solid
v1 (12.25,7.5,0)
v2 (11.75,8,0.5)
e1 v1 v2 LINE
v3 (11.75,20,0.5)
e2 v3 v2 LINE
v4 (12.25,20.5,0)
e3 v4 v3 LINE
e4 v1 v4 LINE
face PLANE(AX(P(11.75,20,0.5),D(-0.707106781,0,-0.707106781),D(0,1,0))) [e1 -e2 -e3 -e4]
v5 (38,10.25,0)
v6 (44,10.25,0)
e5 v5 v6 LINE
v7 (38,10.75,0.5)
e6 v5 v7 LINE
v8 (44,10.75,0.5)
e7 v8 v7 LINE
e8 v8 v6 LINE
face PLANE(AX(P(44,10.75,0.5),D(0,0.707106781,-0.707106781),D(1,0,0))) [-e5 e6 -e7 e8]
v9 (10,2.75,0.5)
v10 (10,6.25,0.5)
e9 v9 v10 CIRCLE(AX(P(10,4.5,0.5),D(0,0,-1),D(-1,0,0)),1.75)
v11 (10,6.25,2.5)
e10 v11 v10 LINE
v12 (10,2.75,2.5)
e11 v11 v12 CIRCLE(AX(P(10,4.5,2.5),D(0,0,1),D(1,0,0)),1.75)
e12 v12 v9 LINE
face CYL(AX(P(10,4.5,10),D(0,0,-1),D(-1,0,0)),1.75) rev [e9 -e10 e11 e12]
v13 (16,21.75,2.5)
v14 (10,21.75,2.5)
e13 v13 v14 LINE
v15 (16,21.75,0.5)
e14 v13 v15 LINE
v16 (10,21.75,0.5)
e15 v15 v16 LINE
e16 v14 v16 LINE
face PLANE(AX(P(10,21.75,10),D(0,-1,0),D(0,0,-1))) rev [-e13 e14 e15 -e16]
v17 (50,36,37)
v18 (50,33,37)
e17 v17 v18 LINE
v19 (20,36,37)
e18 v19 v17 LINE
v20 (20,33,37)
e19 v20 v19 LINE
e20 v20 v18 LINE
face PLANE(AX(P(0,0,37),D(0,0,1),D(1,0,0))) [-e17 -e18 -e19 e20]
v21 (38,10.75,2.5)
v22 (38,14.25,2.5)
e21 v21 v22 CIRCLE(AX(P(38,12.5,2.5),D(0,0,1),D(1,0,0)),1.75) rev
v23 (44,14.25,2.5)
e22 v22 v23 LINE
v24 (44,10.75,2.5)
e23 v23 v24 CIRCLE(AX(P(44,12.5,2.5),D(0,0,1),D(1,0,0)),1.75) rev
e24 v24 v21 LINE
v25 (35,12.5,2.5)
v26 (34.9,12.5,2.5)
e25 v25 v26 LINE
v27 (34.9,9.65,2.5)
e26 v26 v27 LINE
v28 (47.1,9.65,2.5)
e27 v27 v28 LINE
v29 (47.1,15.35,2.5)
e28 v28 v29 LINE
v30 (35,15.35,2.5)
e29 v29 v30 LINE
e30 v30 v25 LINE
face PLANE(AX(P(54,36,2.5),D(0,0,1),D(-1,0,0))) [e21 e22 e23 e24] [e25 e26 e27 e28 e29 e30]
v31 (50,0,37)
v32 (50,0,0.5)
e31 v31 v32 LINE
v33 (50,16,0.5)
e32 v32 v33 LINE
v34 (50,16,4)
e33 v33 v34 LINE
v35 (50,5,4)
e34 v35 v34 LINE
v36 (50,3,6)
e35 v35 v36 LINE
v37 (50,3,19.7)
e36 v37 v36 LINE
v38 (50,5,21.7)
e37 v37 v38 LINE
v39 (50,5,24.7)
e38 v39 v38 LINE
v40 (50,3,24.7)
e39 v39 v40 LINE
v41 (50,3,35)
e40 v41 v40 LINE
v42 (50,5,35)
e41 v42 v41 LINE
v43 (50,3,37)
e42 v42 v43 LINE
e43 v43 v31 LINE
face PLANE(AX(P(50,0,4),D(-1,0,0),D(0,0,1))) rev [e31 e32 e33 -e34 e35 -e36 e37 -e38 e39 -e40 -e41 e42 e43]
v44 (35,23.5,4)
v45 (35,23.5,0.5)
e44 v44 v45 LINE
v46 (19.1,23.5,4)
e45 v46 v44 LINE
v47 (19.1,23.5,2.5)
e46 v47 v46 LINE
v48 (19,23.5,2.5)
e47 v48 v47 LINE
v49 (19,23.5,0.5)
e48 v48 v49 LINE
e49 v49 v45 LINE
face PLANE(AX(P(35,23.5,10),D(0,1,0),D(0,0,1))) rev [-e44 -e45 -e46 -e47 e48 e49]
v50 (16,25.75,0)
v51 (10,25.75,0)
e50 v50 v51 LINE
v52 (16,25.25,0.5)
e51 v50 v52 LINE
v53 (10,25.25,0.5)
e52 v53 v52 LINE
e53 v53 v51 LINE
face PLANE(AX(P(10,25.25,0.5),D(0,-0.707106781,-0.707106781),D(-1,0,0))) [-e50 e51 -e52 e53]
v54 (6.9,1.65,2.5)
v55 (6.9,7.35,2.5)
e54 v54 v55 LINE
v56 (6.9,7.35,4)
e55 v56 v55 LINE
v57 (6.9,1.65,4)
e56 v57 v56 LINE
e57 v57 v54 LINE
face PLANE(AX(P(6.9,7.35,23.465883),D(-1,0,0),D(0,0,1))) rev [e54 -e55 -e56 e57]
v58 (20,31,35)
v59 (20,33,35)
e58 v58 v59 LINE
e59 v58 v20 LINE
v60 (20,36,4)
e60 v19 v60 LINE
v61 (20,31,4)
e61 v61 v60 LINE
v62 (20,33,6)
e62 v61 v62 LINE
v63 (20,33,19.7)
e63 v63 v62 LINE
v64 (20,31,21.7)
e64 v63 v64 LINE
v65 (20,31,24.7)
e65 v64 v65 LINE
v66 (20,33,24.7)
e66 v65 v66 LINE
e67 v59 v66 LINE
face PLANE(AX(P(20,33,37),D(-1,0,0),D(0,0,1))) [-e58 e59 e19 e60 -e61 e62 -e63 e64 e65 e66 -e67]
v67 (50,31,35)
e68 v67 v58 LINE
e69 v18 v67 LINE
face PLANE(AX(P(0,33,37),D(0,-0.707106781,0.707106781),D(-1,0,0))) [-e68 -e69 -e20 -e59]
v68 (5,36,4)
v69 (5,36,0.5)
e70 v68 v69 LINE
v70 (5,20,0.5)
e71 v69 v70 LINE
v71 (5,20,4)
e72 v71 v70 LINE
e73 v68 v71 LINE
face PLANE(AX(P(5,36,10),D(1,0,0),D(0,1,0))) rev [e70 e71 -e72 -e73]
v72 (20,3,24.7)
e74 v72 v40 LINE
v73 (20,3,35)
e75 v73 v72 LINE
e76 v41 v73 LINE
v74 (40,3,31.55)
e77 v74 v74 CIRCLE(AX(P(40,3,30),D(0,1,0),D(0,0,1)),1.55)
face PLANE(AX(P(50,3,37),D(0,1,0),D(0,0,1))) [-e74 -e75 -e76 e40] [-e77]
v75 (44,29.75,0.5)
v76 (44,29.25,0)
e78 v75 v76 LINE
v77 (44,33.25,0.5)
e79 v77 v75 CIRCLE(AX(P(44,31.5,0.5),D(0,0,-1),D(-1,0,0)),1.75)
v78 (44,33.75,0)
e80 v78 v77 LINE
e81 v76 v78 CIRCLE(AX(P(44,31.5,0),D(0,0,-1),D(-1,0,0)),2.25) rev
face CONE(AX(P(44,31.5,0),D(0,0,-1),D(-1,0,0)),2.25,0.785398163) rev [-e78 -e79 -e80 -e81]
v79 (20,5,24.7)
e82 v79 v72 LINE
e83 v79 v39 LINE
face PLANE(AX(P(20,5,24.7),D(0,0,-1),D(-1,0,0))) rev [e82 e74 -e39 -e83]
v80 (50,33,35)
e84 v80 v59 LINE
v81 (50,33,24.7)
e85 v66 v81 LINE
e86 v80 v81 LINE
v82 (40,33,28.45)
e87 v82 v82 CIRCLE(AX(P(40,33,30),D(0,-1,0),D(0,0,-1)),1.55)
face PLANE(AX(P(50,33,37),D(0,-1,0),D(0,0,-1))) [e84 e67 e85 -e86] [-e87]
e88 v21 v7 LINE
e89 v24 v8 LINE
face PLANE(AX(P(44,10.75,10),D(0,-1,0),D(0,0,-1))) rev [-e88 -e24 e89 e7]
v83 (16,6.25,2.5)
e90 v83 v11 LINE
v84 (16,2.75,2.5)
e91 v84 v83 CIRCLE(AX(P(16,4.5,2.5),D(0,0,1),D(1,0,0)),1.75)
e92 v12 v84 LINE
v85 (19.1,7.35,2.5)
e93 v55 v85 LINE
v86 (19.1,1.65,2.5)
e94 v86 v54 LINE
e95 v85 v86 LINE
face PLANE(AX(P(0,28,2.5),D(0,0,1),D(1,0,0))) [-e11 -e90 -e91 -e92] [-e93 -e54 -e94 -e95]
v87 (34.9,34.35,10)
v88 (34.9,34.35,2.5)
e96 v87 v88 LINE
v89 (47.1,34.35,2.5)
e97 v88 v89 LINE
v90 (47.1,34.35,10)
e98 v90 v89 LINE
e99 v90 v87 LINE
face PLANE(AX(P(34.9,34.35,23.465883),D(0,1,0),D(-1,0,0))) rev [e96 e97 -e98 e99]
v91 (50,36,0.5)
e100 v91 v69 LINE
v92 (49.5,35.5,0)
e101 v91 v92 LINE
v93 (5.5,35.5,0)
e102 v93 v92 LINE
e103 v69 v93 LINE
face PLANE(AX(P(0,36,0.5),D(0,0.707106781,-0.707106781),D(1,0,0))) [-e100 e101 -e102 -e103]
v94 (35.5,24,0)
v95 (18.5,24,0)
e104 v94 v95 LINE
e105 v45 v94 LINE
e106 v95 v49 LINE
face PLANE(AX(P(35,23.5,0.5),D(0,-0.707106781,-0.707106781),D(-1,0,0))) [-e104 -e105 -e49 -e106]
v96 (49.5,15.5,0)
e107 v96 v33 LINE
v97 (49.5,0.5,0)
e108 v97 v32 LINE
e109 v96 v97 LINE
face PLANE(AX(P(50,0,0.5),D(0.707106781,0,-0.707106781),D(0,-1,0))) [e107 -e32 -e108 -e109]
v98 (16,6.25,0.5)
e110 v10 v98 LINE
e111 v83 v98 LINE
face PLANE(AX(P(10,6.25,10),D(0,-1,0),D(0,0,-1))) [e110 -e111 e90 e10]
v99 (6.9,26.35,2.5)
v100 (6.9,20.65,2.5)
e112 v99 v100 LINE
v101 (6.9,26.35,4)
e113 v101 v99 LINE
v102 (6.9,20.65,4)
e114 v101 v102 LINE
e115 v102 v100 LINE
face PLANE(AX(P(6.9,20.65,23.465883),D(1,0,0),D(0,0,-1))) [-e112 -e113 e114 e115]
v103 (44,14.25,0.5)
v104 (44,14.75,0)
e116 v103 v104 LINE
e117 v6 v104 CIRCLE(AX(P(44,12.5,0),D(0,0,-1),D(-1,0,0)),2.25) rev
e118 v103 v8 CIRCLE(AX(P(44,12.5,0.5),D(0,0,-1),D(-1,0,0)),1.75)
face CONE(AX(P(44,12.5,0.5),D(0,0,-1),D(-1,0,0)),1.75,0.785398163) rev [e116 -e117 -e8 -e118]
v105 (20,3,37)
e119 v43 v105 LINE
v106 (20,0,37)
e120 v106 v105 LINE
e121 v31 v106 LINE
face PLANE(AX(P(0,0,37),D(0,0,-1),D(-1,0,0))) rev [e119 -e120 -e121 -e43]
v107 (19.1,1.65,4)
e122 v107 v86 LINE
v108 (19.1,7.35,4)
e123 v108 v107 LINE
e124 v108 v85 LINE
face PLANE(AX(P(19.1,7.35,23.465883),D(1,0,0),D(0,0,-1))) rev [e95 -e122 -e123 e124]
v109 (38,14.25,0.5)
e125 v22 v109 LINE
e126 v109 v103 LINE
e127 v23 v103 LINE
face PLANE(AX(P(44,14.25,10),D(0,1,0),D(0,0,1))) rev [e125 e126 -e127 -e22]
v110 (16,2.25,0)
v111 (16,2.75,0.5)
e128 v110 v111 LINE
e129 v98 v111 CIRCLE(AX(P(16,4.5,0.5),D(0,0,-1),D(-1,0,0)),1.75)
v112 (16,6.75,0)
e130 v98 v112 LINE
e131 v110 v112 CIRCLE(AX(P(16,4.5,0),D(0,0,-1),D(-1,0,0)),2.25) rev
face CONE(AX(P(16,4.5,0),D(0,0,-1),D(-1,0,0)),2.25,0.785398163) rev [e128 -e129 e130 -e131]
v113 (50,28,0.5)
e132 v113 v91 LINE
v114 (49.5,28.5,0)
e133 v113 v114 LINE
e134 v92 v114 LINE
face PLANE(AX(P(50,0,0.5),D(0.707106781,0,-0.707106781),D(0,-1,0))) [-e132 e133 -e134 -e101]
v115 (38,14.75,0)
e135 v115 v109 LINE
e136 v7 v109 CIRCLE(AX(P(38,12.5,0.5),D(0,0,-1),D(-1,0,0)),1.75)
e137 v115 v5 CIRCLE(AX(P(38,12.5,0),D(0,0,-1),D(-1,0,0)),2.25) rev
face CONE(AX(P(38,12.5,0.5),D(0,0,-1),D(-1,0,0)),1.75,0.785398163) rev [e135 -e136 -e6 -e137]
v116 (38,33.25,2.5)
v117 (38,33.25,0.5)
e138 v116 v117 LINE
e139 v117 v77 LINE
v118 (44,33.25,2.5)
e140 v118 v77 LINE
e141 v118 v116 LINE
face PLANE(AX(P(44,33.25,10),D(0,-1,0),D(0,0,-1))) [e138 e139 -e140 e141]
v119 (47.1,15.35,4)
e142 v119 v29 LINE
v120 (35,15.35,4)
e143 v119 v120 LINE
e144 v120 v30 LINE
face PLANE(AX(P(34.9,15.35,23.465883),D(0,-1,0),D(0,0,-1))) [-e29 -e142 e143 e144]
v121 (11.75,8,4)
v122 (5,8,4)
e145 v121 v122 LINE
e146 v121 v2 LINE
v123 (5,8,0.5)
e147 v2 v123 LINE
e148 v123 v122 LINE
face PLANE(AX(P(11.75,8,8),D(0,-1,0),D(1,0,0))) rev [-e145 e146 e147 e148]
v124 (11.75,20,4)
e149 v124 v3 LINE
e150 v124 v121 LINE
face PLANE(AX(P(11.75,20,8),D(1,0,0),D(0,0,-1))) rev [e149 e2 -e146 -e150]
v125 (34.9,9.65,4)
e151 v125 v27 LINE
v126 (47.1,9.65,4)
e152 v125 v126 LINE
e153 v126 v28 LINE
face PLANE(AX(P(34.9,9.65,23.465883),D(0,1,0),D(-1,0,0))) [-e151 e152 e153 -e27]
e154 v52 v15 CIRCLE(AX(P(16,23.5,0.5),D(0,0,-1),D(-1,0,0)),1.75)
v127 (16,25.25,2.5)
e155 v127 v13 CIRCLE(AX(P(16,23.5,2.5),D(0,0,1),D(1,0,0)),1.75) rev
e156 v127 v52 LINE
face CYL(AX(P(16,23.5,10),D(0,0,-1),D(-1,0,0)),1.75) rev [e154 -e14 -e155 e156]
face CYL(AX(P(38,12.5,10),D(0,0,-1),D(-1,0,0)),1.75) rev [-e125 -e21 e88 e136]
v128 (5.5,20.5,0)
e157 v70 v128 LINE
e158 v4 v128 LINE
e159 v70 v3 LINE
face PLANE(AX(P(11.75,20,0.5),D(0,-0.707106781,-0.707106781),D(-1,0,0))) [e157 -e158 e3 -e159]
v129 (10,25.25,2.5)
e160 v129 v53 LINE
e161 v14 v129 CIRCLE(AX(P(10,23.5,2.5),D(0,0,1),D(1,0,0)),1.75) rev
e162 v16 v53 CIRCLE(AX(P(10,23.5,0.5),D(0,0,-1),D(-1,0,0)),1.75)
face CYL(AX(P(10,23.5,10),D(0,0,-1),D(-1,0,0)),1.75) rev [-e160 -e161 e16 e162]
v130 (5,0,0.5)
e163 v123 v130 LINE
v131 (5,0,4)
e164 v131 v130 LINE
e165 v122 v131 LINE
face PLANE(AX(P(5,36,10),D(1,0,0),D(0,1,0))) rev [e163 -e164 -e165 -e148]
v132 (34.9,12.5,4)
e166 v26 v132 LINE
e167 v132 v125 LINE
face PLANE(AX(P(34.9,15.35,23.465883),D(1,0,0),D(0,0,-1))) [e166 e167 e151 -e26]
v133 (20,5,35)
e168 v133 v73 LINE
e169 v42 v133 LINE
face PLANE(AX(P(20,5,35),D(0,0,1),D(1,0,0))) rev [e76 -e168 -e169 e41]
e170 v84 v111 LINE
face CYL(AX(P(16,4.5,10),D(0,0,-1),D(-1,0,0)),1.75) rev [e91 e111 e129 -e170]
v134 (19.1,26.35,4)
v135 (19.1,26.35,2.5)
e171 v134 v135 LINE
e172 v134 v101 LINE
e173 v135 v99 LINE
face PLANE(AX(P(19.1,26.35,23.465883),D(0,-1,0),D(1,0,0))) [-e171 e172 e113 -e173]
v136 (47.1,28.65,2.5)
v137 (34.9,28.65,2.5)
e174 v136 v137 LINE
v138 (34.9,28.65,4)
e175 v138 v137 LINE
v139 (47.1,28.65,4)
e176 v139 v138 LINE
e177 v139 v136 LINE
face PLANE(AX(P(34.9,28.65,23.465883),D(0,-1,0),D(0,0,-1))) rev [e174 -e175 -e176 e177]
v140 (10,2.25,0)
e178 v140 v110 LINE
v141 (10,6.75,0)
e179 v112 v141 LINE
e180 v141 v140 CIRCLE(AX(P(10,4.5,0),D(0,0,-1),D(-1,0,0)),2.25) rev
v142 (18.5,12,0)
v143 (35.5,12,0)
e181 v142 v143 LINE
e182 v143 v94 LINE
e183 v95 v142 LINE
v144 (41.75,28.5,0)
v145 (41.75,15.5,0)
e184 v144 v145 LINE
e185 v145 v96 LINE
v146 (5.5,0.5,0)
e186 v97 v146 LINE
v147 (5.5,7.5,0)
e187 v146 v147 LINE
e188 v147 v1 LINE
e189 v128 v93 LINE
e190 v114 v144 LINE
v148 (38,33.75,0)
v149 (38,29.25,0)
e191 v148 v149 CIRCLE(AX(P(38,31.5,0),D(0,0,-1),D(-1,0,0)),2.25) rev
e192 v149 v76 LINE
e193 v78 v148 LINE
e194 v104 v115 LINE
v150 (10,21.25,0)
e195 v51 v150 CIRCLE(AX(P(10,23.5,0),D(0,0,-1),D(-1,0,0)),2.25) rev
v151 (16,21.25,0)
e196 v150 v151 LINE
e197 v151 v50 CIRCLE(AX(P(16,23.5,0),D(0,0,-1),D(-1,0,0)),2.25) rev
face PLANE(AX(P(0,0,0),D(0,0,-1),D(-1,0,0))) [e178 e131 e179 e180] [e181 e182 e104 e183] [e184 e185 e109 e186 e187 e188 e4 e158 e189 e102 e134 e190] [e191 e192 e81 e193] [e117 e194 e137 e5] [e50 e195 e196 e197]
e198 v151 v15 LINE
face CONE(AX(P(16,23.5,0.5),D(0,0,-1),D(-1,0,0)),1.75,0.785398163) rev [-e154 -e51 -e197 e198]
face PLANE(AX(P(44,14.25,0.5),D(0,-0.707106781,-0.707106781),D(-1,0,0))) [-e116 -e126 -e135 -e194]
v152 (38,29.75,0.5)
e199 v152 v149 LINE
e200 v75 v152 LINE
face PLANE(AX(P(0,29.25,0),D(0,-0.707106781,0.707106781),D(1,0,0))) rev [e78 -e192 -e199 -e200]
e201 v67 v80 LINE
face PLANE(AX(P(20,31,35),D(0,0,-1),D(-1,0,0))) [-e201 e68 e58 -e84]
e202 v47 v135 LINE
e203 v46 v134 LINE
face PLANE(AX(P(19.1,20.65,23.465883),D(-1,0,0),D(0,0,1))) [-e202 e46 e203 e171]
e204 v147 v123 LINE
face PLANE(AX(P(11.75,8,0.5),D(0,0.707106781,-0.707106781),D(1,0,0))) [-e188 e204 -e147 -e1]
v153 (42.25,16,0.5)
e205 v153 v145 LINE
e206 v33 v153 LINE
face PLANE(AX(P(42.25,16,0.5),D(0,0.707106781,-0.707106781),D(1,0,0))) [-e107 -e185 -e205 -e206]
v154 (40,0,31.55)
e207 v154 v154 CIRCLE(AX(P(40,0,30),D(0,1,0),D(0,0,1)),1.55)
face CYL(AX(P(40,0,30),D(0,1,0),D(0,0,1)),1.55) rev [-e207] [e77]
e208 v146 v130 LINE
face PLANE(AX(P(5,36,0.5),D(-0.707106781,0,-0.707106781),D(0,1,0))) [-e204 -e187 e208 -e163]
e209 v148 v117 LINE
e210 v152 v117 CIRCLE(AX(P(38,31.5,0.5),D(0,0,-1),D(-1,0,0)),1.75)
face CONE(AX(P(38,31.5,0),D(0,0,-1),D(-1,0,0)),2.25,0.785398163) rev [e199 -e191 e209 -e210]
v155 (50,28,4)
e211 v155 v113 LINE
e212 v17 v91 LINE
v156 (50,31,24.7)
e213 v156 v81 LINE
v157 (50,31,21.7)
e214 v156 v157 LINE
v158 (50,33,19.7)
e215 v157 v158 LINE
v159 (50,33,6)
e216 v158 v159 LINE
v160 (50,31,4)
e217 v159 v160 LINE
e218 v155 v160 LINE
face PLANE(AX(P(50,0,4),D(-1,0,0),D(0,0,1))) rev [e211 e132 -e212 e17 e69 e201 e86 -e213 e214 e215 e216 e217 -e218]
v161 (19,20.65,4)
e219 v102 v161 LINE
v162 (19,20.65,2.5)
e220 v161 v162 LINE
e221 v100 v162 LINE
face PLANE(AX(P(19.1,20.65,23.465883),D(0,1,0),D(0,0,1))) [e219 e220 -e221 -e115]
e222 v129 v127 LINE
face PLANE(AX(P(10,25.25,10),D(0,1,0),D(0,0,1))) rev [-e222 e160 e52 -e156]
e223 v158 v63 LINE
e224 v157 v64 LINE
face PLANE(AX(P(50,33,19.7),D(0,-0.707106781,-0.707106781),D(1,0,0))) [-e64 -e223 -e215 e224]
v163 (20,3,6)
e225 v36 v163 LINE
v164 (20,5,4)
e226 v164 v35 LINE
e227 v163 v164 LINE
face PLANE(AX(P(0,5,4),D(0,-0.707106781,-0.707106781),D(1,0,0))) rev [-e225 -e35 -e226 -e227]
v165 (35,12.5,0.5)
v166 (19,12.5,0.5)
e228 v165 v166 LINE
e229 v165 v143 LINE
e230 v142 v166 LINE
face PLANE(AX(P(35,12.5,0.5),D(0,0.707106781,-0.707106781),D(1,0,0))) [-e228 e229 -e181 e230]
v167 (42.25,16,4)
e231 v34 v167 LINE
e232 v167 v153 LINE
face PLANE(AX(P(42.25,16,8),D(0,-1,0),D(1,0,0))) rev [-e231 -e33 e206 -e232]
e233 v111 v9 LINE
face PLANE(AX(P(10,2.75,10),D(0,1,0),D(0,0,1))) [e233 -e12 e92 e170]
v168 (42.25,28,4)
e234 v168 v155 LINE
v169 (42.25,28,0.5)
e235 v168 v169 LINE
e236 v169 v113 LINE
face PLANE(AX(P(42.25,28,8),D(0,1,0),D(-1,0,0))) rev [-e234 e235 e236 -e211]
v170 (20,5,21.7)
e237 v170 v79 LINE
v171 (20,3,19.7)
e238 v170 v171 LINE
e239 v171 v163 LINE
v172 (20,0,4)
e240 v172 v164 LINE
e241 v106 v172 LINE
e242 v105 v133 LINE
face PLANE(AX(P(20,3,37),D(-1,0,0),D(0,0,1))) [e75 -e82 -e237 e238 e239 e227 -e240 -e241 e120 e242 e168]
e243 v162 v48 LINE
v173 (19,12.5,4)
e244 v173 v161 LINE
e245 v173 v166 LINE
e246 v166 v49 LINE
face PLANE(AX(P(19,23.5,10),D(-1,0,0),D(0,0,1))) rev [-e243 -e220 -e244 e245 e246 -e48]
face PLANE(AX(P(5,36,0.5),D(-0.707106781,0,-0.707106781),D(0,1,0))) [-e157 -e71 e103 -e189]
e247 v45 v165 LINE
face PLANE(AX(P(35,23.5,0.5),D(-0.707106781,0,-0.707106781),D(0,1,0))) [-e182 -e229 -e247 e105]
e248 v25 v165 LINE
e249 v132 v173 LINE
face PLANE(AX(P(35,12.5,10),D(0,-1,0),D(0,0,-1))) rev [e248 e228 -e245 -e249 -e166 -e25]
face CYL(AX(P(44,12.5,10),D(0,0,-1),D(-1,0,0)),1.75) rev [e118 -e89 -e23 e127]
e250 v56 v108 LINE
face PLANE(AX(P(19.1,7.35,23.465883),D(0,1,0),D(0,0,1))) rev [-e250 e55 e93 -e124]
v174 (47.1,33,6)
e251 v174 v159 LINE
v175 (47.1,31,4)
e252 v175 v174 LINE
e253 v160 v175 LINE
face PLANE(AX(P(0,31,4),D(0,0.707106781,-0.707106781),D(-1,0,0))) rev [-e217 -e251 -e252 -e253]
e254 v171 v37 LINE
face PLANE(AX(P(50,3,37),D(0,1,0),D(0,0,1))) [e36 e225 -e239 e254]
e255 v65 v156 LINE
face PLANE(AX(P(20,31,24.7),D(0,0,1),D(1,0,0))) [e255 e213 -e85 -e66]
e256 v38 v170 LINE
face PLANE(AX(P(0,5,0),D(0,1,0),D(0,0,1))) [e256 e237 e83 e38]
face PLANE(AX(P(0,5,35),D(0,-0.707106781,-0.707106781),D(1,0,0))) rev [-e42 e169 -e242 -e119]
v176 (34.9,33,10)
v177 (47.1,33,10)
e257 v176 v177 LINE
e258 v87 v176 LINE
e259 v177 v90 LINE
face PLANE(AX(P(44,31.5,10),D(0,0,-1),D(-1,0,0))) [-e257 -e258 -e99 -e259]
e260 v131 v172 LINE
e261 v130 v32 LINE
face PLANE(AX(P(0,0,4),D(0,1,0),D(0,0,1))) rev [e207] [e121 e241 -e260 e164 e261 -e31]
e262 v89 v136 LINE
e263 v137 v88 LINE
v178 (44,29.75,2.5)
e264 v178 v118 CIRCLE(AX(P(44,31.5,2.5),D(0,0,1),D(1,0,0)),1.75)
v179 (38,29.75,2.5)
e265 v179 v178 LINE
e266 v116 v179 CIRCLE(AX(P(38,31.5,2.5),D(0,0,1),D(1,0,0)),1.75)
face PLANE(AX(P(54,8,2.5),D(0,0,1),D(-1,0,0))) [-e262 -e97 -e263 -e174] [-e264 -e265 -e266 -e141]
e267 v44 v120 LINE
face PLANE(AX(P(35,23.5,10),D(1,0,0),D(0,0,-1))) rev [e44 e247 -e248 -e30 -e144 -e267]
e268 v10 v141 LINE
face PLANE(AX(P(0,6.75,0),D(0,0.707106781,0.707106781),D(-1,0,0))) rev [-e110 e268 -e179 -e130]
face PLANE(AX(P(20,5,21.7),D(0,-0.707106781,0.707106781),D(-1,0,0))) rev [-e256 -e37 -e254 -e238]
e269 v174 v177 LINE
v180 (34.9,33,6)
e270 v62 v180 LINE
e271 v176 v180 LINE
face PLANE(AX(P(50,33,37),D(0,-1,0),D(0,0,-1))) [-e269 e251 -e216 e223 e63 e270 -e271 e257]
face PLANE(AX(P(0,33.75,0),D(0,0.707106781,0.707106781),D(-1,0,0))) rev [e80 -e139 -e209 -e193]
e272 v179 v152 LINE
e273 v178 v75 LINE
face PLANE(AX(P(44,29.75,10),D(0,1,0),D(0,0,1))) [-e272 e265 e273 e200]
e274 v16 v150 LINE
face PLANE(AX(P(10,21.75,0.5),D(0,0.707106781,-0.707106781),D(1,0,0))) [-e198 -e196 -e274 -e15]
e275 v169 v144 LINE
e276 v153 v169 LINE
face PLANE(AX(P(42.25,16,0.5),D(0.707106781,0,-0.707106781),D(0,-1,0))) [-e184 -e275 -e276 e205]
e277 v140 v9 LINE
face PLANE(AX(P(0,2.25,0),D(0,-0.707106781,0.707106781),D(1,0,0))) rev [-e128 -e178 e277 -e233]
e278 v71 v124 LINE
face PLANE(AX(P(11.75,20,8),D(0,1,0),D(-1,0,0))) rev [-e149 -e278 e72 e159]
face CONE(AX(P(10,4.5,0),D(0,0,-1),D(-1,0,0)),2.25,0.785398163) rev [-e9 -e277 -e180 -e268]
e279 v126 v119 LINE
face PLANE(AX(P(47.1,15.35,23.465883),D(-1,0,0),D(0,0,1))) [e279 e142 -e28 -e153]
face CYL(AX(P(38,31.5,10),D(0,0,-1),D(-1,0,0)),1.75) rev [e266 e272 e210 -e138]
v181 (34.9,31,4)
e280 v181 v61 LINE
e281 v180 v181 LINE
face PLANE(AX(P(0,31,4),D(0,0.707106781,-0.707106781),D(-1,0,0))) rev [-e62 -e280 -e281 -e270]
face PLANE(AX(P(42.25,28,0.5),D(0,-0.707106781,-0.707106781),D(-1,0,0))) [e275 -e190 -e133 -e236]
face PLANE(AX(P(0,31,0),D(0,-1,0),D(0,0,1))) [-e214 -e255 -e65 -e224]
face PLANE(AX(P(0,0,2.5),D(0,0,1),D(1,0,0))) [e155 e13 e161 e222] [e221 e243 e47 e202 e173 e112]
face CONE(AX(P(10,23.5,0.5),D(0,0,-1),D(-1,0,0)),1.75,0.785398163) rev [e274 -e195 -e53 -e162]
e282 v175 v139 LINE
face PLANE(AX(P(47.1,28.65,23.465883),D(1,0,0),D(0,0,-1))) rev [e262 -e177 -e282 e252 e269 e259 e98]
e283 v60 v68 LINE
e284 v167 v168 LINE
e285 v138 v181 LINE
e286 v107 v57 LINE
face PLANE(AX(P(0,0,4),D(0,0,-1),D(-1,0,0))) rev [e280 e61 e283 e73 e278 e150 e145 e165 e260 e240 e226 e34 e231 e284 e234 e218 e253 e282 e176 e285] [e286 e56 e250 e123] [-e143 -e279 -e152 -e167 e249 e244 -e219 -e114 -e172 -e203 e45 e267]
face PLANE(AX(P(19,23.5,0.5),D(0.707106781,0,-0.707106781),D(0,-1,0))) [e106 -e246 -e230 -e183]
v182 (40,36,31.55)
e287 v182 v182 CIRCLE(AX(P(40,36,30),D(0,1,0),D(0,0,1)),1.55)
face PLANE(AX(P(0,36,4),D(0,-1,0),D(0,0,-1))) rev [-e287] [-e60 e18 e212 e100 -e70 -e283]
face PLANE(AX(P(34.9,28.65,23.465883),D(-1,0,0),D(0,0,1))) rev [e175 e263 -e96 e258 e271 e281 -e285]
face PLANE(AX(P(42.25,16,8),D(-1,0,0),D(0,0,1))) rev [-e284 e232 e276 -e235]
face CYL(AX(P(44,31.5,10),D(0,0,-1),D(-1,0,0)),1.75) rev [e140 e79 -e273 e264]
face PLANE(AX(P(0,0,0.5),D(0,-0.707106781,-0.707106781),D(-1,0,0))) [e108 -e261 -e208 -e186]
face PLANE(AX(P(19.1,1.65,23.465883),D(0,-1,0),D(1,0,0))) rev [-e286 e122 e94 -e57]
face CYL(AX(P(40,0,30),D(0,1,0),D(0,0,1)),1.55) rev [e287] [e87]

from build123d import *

# Parameters (mm, degrees)
SKETCH1_W                   = 50
SKETCH1_H                   = 36
BOSS_EXTRUDE1_DEPTH         = 4
SKETCH2_W                   = 30
SKETCH2_H                   = 3
BOSS_EXTRUDE2_DEPTH         = 37
SKETCH3_R                   = 1.55
CUT_EXTRUDE1_DEPTH          = 72.867934435
SKETCH4_W                   = 16
SKETCH4_H                   = 11
CUT_EXTRUDE2_DEPTH          = 10
CUT_EXTRUDE3_DEPTH          = 10
SKETCH6_W                   = 20
SKETCH6_H                   = 12
CUT_EXTRUDE4_DEPTH          = 8
SKETCH7_W                   = 30
SKETCH7_H                   = 3
BOSS_EXTRUDE3_DEPTH         = 2
CHAMFER1_SIZE               = 2
CIRPATTERN1_COUNT           = 2
CIRPATTERN1_COPY_1_DEPTH    = 10
SKETCH9_W                   = 5
SKETCH9_H                   = 36
CUT_EXTRUDE6_DEPTH          = 10
CHAMFER2_SIZE               = 0.5
SKETCH10_W                  = 30
SKETCH10_H                  = 2
BOSS_EXTRUDE4_DEPTH         = 2
CHAMFER3_SIZE               = 2
CUT_EXTRUDE7_START          = -1.5
SKETCH12_W                  = 12.2
SKETCH12_H                  = 5.7
CUT_EXTRUDE7_DEPTH          = 7.5
CIRPATTERN2_COUNT           = 2
CIRPATTERN2_START           = -1.5
CIRPATTERN2_COPY_1_SKETCH_W = 12.2
CIRPATTERN2_COPY_1_SKETCH_H = 5.7
CIRPATTERN2_COPY_1_DEPTH    = 7.5
CHAMFER4_SIZE               = 2


with BuildPart() as part:
    # Sketch1 → Boss-Extrude1 (new body)
    with BuildSketch(Plane.XY):
        with Locations((25, 18)):
            Rectangle(SKETCH1_W, SKETCH1_H)
    extrude(amount=BOSS_EXTRUDE1_DEPTH)

    # Sketch2 → Boss-Extrude2 (add)
    with BuildSketch(Plane(origin=(0, 0, 0), x_dir=(-1, 0, 0), z_dir=(0, 0, -1))):
        with Locations((-35, 34.5)):
            Rectangle(SKETCH2_W, SKETCH2_H)
        with Locations((-35, 1.5)):
            Rectangle(SKETCH2_W, SKETCH2_H)
    extrude(amount=-BOSS_EXTRUDE2_DEPTH)

    # Sketch3 → Cut-Extrude1 (cut, through all)
    with BuildSketch(Plane(origin=(0, 36, 0), x_dir=(1, 0, 0), z_dir=(0, 1, 0))):
        with Locations(Location((40, -30, 0), (0, 0, 270))):
            Circle(SKETCH3_R)
    extrude(amount=-CUT_EXTRUDE1_DEPTH, mode=Mode.SUBTRACT)

    # Sketch4 → Cut-Extrude2 (cut)
    with BuildSketch(Plane(origin=(0, 0, 0), x_dir=(-1, 0, 0), z_dir=(0, 0, -1))):
        with Locations((-27, 18)):
            Rectangle(SKETCH4_W, SKETCH4_H)
    extrude(amount=-CUT_EXTRUDE2_DEPTH, mode=Mode.SUBTRACT)

    # Sketch5 → Cut-Extrude3 (cut)
    with BuildSketch(Plane(origin=(0, 0, 0), x_dir=(-1, 0, 0), z_dir=(0, 0, -1))):
        with BuildLine():
            Line((-44, 14.25), (-38, 14.25))
            ThreePointArc((-38, 14.25), (-36.25, 12.5), (-38, 10.75))
            Line((-38, 10.75), (-44, 10.75))
            ThreePointArc((-44, 10.75), (-45.75, 12.5), (-44, 14.25))
        make_face()
    cut_extrude3 = extrude(amount=-CUT_EXTRUDE3_DEPTH, mode=Mode.SUBTRACT)

    # Mirror1: Cut-Extrude3 across plane
    add(cut_extrude3.mirror(Plane.ZX.offset(22)), mode=Mode.SUBTRACT)

    # Sketch6 → Cut-Extrude4 (cut)
    with BuildSketch(Plane(origin=(0, 0, 0), x_dir=(-1, 0, 0), z_dir=(0, 0, -1))):
        with Locations((-52.25, 22)):
            Rectangle(SKETCH6_W, SKETCH6_H)
    cut_extrude4 = extrude(amount=-CUT_EXTRUDE4_DEPTH, mode=Mode.SUBTRACT)

    # Sketch7 → Boss-Extrude3 (add)
    with BuildSketch(Plane(origin=(0, 3, 0), x_dir=(1, 0, 0), z_dir=(0, 1, 0))):
        with Locations((35, -23.2)):
            Rectangle(SKETCH7_W, SKETCH7_H)
    boss_extrude3 = extrude(amount=BOSS_EXTRUDE3_DEPTH)

    # Mirror3: Boss-Extrude3 across plane
    add(boss_extrude3.mirror(Plane.ZX.offset(18)))

    # Chamfer1
    chamfer1_edges = [part.edges().sort_by_distance(p)[0] for p in [
        (35, 33, 21.7),
        (35, 3, 21.7),
    ]]
    chamfer(chamfer1_edges, length=CHAMFER1_SIZE - 0.0001)  # a hair under: the kernel refuses the full size

    # CirPattern1: Cut-Extrude3, Cut-Extrude4 ×2 about axis
    cirpattern1_axis = Axis((27, 18, 0), (0, 0, 1))
    add([cut_extrude3.rotate(cirpattern1_axis, i * 360 / CIRPATTERN1_COUNT) for i in range(1, CIRPATTERN1_COUNT)], mode=Mode.SUBTRACT)
    add([cut_extrude4.rotate(cirpattern1_axis, i * 360 / CIRPATTERN1_COUNT) for i in range(1, CIRPATTERN1_COUNT)], mode=Mode.SUBTRACT)

    # CirPattern1 copy 1 sketch → CirPattern1 copy 1 (cut)
    with BuildSketch(Plane(origin=(54, -8, 0), x_dir=(1, 0, 0), z_dir=(0, 0, -1))):
        with BuildLine():
            Line((-44, -14.25), (-38, -14.25))
            ThreePointArc((-38, -14.25), (-36.25, -12.5), (-38, -10.75))
            Line((-38, -10.75), (-44, -10.75))
            ThreePointArc((-44, -10.75), (-45.75, -12.5), (-44, -14.25))
        make_face()
    extrude(amount=-CIRPATTERN1_COPY_1_DEPTH, mode=Mode.SUBTRACT)

    # Sketch9 → Cut-Extrude6 (cut)
    with BuildSketch(Plane(origin=(0, 0, 0), x_dir=(-1, 0, 0), z_dir=(0, 0, -1))):
        with Locations((-2.5, 18)):
            Rectangle(SKETCH9_W, SKETCH9_H)
    extrude(amount=-CUT_EXTRUDE6_DEPTH, mode=Mode.SUBTRACT)

    # Chamfer2
    chamfer2_edges = [part.edges().sort_by_distance(p)[0] for p in [
        (41, 29.75, 0),
        (45.75, 31.5, 0),
        (36.25, 31.5, 0),
        (41, 33.25, 0),
        (50, 32, 0),
        (46.125, 28, 0),
        (46.125, 16, 0),
        (42.25, 22, 0),
        (8.25, 23.5, 0),
        (13, 25.25, 0),
        (17.75, 23.5, 0),
        (13, 21.75, 0),
        (8.25, 4.5, 0),
        (13, 2.75, 0),
        (17.75, 4.5, 0),
        (13, 6.25, 0),
        (8.375, 8, 0),
        (11.75, 14, 0),
        (8.375, 20, 0),
        (27.5, 0, 0),
        (5, 28, 0),
        (5, 4, 0),
        (27.5, 36, 0),
        (50, 8, 0),
        (35, 18, 0),
        (27, 12.5, 0),
        (19, 18, 0),
        (27, 23.5, 0),
        (45.75, 12.5, 0),
        (41, 10.75, 0),
        (36.25, 12.5, 0),
        (41, 14.25, 0),
    ]]
    chamfer(chamfer2_edges, length=CHAMFER2_SIZE)

    # Sketch10 → Boss-Extrude4 (add)
    with BuildSketch(Plane(origin=(0, 3, 0), x_dir=(1, 0, 0), z_dir=(0, 1, 0))):
        with Locations((35, -36)):
            Rectangle(SKETCH10_W, SKETCH10_H)
    boss_extrude4 = extrude(amount=BOSS_EXTRUDE4_DEPTH)

    # Mirror4: Boss-Extrude4 across plane
    add(boss_extrude4.mirror(Plane.ZX.offset(18)))

    # Chamfer3
    chamfer3_edges = [part.edges().sort_by_distance(p)[0] for p in [
        (35, 31, 37),
        (35, 5, 37),
    ]]
    chamfer(chamfer3_edges, length=CHAMFER3_SIZE - 0.0001)  # a hair under: the kernel refuses the full size

    # Sketch12 → Cut-Extrude7 (cut)
    with BuildSketch(Plane.XY.offset(4).offset(CUT_EXTRUDE7_START)):
        with Locations((13, 23.5)):
            Rectangle(SKETCH12_W, SKETCH12_H)
    cut_extrude7 = extrude(amount=CUT_EXTRUDE7_DEPTH, mode=Mode.SUBTRACT)

    # Mirror5: Cut-Extrude7 across plane
    add(cut_extrude7.mirror(Plane(origin=(0, 14, 0), x_dir=(0, 0, 1), z_dir=(0, -1, 0))), mode=Mode.SUBTRACT)

    # CirPattern2: Cut-Extrude7 ×2 about axis
    cirpattern2_axis = Axis((27, 18, 0), (0, 0, 1))
    for i in range(1, CIRPATTERN2_COUNT):
        add(cut_extrude7.rotate(cirpattern2_axis, i * 360 / CIRPATTERN2_COUNT), mode=Mode.SUBTRACT)

    # CirPattern2 copy 1 sketch → CirPattern2 copy 1 (cut)
    with BuildSketch(Plane(origin=(54, 8, 4), x_dir=(-1, 0, 0), z_dir=(0, 0, 1)).offset(CIRPATTERN2_START)):
        with Locations((13, -23.5)):
            Rectangle(CIRPATTERN2_COPY_1_SKETCH_W, CIRPATTERN2_COPY_1_SKETCH_H)
    extrude(amount=CIRPATTERN2_COPY_1_DEPTH, mode=Mode.SUBTRACT)

    # Chamfer4
    chamfer4_edges = [part.edges().sort_by_distance(p)[0] for p in [
        (48.55, 33, 4),
        (35, 3, 4),
        (27.45, 33, 4),
    ]]
    chamfer(chamfer4_edges, length=CHAMFER4_SIZE)


solid = part.part
